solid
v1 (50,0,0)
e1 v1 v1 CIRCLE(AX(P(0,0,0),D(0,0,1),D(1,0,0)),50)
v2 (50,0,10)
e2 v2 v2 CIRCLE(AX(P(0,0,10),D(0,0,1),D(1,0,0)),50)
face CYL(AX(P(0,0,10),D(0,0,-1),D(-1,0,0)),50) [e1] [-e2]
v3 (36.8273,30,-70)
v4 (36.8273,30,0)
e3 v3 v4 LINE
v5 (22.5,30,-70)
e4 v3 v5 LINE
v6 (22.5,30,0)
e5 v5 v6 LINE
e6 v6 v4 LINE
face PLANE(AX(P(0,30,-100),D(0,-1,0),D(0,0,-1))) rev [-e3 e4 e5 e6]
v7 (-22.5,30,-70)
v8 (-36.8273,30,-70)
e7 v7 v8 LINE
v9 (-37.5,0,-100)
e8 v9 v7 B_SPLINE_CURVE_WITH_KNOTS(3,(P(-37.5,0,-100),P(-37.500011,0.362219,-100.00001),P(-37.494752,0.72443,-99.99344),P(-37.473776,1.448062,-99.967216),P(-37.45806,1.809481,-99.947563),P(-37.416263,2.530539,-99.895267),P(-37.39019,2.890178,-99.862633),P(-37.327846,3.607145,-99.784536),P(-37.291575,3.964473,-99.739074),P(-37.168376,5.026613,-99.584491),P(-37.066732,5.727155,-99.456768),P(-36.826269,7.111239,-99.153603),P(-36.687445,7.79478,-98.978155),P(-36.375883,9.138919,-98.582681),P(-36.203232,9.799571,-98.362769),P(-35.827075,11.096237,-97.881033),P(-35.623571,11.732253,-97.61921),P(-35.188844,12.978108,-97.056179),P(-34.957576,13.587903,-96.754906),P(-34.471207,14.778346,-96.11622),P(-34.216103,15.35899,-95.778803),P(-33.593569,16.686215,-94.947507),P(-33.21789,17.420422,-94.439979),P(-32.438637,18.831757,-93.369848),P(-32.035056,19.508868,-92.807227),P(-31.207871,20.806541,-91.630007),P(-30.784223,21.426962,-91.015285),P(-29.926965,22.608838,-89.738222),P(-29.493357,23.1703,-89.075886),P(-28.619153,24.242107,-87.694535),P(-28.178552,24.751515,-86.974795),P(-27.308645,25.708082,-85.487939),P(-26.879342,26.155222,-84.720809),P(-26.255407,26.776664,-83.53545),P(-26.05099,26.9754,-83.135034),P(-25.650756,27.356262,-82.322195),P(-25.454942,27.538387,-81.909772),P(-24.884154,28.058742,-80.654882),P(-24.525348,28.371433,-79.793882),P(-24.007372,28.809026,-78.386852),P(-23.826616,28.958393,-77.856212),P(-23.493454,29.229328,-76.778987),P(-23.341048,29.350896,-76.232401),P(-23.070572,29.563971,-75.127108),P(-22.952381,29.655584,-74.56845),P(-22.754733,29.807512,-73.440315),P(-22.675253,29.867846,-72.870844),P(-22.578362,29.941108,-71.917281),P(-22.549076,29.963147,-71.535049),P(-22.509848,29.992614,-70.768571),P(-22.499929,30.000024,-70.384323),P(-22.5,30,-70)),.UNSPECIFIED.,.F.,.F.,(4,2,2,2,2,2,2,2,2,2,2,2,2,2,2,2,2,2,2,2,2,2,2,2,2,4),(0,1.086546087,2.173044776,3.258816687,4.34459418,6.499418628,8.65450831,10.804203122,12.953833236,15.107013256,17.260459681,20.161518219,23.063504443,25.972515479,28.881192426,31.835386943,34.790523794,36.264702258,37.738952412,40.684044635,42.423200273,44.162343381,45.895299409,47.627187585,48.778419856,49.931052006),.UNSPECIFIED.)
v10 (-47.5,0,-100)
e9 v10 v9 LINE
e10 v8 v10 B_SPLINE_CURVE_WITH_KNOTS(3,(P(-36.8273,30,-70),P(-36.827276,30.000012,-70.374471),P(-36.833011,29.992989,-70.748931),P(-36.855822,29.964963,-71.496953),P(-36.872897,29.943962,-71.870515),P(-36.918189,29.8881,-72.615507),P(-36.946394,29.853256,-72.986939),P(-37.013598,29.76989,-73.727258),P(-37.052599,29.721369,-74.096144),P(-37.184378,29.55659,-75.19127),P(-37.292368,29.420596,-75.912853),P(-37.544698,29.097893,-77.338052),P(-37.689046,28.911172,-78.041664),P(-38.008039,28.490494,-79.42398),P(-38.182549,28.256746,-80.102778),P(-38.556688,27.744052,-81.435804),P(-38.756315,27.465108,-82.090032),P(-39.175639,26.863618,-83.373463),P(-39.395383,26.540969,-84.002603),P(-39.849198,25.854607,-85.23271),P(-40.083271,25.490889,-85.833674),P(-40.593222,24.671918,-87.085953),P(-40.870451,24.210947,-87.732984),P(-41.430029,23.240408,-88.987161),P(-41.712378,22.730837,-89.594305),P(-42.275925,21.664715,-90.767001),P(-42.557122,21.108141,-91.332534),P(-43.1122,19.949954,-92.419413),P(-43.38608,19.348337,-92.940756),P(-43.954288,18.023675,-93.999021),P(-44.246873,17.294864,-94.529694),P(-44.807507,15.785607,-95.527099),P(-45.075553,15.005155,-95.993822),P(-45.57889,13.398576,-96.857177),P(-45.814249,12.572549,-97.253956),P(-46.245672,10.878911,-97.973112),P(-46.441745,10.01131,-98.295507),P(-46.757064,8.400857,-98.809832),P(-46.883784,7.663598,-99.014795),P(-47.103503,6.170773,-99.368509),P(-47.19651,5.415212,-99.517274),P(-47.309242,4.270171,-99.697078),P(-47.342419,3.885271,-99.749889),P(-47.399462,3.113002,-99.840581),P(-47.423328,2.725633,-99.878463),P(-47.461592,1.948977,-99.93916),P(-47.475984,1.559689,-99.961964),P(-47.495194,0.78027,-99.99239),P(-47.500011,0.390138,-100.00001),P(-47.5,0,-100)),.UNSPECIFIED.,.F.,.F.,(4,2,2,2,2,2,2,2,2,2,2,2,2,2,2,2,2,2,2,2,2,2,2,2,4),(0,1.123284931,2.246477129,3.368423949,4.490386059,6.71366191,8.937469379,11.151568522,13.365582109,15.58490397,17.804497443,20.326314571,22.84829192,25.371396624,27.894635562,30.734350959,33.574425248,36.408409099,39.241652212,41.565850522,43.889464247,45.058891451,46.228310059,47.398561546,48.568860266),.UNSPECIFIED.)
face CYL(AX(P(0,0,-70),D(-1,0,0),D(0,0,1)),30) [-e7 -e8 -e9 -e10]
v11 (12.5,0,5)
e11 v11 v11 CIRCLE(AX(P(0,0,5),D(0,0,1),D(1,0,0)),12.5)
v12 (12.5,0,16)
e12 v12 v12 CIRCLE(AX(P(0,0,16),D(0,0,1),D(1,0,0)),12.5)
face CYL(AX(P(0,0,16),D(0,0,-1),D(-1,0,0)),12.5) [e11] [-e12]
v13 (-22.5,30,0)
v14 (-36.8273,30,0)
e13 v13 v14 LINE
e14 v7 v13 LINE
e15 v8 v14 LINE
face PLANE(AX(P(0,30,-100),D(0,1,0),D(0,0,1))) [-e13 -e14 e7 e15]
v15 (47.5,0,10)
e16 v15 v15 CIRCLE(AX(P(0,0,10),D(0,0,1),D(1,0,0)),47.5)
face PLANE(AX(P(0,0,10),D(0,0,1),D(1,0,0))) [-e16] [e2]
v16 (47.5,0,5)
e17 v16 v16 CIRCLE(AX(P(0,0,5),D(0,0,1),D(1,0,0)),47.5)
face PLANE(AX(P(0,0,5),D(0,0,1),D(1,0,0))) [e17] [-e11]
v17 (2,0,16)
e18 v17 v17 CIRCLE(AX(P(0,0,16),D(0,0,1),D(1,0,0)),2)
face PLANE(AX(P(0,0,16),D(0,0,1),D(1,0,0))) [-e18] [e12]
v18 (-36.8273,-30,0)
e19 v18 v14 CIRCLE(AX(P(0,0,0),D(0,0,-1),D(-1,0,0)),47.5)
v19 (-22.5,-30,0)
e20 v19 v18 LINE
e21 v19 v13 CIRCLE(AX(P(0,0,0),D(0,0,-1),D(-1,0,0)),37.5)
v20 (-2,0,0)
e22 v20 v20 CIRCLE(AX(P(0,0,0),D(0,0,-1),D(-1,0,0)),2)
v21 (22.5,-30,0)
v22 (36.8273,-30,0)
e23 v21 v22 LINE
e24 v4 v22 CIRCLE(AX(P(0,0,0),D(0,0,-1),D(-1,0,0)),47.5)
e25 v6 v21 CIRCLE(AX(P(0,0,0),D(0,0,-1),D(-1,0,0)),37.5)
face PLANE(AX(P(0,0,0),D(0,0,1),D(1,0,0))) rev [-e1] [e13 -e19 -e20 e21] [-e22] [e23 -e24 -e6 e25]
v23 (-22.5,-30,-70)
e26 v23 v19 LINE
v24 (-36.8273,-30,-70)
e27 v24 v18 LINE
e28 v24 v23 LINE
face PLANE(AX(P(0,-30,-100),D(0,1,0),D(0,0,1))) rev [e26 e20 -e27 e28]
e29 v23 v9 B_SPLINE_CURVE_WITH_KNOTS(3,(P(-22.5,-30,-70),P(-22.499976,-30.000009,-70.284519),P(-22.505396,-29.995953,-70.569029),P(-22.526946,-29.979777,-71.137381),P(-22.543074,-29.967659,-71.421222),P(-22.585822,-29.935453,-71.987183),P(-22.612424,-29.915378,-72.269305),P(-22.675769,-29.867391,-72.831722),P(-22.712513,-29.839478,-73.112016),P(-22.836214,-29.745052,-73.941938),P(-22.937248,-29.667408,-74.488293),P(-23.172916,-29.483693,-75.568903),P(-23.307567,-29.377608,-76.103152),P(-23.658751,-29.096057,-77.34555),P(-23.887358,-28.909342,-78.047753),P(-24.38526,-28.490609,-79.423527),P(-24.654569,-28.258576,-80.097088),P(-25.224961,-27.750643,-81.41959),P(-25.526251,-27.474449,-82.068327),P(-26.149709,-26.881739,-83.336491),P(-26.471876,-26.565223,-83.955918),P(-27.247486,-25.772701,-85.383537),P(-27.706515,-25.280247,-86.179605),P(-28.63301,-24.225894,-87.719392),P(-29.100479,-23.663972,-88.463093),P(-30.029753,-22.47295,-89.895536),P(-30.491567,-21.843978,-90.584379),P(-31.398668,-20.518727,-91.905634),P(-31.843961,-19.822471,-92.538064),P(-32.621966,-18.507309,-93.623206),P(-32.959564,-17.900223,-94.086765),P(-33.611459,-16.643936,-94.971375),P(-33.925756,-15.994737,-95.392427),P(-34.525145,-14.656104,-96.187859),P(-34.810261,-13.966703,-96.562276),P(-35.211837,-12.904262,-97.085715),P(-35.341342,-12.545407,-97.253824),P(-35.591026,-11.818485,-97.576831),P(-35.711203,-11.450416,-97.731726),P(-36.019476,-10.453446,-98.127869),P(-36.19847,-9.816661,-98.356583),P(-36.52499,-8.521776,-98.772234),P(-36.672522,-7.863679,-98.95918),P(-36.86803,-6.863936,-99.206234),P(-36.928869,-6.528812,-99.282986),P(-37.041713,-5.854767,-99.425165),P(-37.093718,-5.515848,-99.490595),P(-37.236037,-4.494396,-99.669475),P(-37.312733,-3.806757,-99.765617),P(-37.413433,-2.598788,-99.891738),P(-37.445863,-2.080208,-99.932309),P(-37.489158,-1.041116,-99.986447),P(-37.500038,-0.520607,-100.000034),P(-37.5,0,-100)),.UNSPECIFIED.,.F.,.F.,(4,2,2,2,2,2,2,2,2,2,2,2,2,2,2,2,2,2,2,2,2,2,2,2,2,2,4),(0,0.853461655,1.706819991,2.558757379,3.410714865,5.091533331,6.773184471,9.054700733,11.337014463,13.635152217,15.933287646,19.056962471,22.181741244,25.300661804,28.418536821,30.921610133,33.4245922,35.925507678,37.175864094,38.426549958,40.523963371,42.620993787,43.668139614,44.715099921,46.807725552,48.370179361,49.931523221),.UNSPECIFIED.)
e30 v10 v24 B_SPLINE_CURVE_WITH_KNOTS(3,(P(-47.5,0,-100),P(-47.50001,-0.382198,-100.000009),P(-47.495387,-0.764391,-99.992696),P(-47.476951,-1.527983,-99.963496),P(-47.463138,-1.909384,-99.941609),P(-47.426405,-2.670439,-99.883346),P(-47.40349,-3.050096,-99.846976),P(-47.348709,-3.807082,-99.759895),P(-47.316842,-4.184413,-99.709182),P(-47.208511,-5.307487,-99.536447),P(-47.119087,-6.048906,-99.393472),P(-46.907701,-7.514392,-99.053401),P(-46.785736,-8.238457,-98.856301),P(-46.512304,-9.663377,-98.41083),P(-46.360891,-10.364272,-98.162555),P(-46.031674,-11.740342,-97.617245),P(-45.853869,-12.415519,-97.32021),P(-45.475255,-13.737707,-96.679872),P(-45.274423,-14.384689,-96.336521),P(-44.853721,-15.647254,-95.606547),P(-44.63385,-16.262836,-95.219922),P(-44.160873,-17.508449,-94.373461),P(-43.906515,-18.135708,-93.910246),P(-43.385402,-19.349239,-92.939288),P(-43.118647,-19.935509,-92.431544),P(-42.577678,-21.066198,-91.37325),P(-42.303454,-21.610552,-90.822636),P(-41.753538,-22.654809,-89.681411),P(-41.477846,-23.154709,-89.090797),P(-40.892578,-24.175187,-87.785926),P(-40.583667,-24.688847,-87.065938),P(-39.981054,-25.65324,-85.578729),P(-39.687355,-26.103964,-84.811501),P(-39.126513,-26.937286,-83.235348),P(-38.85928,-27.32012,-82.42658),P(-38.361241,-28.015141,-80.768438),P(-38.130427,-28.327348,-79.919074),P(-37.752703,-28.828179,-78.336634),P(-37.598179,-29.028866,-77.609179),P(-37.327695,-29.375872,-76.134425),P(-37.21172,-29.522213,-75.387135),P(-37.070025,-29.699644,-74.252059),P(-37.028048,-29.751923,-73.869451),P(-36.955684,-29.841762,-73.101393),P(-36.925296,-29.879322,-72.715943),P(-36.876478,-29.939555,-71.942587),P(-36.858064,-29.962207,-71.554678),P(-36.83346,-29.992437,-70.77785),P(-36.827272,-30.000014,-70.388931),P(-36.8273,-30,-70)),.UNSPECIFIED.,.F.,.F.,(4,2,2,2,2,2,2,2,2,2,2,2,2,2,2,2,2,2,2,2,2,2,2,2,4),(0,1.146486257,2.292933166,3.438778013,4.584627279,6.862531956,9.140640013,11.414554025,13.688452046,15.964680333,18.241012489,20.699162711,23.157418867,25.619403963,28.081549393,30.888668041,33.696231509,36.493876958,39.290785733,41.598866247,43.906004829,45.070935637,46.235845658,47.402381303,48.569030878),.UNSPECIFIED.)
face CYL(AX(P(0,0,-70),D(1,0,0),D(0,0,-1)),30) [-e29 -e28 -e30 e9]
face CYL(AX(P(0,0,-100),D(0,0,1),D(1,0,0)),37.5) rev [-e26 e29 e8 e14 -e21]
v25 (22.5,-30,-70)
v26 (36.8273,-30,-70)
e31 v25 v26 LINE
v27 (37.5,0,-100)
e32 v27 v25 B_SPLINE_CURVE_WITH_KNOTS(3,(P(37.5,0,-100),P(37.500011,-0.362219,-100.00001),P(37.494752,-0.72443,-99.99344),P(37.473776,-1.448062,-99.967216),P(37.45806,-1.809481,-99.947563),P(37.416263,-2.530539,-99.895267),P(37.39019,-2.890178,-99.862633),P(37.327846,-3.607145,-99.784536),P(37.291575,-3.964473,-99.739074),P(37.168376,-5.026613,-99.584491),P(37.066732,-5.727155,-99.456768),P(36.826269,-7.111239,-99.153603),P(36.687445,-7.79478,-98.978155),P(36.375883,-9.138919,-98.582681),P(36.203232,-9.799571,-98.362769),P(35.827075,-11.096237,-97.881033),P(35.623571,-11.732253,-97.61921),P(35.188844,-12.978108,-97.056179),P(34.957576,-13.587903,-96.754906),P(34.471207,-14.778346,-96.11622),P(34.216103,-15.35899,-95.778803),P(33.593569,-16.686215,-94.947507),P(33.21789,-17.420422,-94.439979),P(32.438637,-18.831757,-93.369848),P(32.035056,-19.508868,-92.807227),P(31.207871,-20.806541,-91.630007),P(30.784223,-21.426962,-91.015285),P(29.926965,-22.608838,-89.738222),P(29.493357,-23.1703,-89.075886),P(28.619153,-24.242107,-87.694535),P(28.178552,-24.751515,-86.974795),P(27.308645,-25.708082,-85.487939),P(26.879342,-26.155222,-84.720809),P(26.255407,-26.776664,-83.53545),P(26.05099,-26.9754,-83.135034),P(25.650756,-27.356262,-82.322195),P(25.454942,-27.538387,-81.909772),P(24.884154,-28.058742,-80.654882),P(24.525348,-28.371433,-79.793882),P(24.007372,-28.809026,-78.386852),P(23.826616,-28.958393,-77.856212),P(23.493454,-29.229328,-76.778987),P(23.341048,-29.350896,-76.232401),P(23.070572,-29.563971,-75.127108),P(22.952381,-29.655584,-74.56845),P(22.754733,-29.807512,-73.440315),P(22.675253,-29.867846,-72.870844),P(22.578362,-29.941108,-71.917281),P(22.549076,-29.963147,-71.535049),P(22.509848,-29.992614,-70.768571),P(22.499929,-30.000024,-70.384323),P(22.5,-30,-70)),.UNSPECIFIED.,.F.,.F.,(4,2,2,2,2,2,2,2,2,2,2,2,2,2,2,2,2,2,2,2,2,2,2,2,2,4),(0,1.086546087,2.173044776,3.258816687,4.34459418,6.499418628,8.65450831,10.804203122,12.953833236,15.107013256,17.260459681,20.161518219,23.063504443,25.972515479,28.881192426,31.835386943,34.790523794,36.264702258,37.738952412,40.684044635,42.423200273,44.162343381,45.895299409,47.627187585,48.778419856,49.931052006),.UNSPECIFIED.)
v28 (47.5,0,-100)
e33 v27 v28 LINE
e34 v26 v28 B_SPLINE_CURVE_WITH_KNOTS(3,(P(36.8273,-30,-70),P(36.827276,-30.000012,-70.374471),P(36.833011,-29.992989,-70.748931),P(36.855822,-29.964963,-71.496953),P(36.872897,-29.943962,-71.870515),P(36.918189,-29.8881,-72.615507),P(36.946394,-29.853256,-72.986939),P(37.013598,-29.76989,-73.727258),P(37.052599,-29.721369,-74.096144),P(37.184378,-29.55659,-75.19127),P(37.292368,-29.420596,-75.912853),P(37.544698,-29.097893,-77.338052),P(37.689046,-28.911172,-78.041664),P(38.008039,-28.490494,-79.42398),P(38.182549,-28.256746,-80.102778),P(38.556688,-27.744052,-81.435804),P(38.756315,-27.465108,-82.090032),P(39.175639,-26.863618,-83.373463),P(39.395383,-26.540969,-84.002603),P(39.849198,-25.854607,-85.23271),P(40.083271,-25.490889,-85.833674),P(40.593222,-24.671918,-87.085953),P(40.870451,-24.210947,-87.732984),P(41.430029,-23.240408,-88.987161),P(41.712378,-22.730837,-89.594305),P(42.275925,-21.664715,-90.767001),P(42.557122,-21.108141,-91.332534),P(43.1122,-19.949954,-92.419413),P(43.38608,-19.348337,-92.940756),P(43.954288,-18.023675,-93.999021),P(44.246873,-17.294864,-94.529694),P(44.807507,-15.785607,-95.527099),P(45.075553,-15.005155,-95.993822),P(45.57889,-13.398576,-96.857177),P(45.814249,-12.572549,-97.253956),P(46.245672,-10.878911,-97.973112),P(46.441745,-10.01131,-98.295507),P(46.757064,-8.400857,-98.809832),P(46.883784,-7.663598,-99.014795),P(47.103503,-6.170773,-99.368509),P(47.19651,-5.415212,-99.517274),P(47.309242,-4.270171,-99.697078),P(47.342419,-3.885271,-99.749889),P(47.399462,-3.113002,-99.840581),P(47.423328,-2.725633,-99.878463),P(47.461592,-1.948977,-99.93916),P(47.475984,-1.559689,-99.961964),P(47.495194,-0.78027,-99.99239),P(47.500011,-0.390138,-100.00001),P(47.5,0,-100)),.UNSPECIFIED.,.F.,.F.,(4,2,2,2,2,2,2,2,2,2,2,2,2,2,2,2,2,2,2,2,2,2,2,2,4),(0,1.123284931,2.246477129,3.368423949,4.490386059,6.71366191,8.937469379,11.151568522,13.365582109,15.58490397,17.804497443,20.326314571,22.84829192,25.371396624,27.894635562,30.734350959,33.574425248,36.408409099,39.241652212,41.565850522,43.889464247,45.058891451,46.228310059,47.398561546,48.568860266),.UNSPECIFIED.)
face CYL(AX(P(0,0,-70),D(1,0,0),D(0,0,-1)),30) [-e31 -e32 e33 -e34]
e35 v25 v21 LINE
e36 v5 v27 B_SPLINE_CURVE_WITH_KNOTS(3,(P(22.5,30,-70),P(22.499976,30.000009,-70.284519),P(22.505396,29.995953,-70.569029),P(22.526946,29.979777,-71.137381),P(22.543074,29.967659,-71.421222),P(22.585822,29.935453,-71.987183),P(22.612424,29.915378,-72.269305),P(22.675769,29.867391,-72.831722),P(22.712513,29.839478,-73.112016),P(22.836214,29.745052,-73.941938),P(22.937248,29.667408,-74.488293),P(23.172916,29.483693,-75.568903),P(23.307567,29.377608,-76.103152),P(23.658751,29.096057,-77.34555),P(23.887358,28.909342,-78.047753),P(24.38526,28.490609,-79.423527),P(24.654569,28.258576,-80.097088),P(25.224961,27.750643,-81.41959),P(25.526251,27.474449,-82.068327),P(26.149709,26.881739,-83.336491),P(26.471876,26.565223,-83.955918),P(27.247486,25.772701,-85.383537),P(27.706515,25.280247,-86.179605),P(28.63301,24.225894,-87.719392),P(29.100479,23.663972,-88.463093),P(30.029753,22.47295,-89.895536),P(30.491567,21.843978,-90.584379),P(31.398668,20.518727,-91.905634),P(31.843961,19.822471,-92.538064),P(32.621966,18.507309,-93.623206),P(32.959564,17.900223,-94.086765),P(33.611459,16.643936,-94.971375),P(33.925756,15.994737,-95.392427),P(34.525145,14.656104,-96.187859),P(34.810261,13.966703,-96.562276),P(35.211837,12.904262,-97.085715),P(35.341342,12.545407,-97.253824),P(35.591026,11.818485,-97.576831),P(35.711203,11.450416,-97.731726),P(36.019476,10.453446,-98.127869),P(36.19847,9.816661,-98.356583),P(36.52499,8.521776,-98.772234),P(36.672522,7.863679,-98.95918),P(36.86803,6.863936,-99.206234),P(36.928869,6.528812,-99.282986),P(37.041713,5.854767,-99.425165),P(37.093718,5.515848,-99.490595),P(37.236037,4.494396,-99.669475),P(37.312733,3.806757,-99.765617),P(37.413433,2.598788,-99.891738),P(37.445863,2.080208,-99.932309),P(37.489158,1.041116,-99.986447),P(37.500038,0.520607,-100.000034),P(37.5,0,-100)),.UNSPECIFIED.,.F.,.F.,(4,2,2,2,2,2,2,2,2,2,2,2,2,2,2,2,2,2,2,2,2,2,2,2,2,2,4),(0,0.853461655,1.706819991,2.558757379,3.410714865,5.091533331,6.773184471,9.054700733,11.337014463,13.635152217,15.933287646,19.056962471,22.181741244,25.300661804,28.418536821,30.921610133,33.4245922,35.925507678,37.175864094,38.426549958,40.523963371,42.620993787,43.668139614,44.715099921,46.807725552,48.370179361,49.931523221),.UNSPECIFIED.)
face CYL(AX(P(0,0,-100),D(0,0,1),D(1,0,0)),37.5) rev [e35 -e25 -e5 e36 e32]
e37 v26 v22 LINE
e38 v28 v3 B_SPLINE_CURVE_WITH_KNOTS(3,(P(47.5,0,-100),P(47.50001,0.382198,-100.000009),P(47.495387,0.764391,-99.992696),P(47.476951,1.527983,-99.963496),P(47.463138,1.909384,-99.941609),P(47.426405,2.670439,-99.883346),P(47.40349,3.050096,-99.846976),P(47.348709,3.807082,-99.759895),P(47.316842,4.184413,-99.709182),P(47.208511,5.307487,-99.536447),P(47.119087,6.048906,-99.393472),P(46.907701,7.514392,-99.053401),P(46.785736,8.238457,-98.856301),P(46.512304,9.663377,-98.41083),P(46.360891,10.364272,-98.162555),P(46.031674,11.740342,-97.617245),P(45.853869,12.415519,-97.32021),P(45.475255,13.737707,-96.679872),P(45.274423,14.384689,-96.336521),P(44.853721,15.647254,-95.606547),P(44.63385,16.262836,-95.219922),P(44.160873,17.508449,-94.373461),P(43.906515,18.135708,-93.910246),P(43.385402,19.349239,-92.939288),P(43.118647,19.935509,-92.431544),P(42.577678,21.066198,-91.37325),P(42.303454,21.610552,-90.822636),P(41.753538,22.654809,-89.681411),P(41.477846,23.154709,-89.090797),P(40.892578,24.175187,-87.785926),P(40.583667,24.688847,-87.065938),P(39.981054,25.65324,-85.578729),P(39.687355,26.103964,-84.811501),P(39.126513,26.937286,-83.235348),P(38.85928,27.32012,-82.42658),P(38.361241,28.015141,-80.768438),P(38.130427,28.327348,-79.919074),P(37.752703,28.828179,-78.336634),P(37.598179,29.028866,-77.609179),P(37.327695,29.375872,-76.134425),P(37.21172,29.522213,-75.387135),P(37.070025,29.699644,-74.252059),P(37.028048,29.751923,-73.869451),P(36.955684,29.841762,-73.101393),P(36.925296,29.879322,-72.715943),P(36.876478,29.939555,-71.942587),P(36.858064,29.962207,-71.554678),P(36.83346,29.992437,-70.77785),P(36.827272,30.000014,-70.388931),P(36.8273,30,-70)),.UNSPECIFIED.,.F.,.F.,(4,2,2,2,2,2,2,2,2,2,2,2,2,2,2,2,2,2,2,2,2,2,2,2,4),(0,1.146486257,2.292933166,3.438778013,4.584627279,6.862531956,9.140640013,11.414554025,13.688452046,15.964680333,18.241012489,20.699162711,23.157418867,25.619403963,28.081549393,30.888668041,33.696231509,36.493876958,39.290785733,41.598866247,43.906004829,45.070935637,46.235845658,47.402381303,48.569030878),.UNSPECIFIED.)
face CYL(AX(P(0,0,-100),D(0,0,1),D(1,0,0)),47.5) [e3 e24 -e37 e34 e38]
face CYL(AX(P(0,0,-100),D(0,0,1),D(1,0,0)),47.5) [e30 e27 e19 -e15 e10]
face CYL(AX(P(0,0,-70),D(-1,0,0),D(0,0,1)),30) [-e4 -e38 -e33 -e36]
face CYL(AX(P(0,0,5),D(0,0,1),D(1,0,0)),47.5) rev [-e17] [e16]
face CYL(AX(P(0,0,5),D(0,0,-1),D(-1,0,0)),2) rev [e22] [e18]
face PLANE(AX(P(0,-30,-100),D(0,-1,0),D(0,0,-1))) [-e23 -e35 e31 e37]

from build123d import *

# Parameters (mm, degrees)
ESQUISSE1_R             = 50
BOSS_EXTRU_1_DEPTH      = 10
ESQUISSE2_R             = 47.5
ENL_V_MAT_EXTRU_1_DEPTH = 5
ESQUISSE3_R             = 2
ENL_V_MAT_EXTRU_2_DEPTH = 5
BOSS_EXTRU_2_DEPTH      = 100
CONG_1_R                = 30
ESQUISSE5_R             = 12.5
BOSS_EXTRU_3_DEPTH      = 11
ENL_V_START             = -11
ESQUISSE6_R             = 2
ENL_V_MAT_EXTRU_3_DEPTH = 11


with BuildPart() as part:
    # Esquisse1 → Boss.-Extru.1 (new body)
    with BuildSketch(Plane.XY):
        Circle(ESQUISSE1_R)
    extrude(amount=BOSS_EXTRU_1_DEPTH)

    # Esquisse2 → Enlèv. mat.-Extru.1 (cut)
    with BuildSketch(Plane.XY.offset(10)):
        Circle(ESQUISSE2_R)
    extrude(amount=-ENL_V_MAT_EXTRU_1_DEPTH, mode=Mode.SUBTRACT)

    # Esquisse3 → Enlèv. mat.-Extru.2 (cut)
    with BuildSketch(Plane(origin=(0, 0, 0), x_dir=(-1, 0, 0), z_dir=(0, 0, -1))):
        Circle(ESQUISSE3_R)
    extrude(amount=-ENL_V_MAT_EXTRU_2_DEPTH, mode=Mode.SUBTRACT)

    # Esquisse4 → Boss.-Extru.2 (add)
    with BuildSketch(Plane(origin=(0, 0, 0), x_dir=(-1, 0, 0), z_dir=(0, 0, -1))):
        with BuildLine():
            ThreePointArc((-22.5, -30), (-37.5, 0), (-22.5, 30))
            Line((-22.5, 30), (-36.827299657, 30))
            ThreePointArc((-36.827299657, 30), (-47.5, 0), (-36.827299657, -30))
            Line((-36.827299657, -30), (-22.5, -30))
        make_face()
        with BuildLine():
            Line((36.827299657, 30), (22.5, 30))
            ThreePointArc((22.5, 30), (33.541019662, 16.770509831), (37.5, 0))
            ThreePointArc((37.5, 0), (33.541019662, -16.770509831), (22.5, -30))
            Line((22.5, -30), (36.827299657, -30))
            ThreePointArc((36.827299657, -30), (44.752355992, -15.920949505), (47.5, 0))
            ThreePointArc((47.5, 0), (44.752355992, 15.920949505), (36.827299657, 30))
        make_face()
    extrude(amount=BOSS_EXTRU_2_DEPTH)

    # Congé1
    # the kernel refuses this fillet: 30 mm, written as the material it takes off along each edge
    with BuildSketch(Plane(origin=(111.827299657, -30, -100), x_dir=(0, 0, 1), z_dir=(-1, 0, 0)), Plane(origin=(-52.5, 30, -100), x_dir=(0, 0, 1), z_dir=(1, 0, 0)), Plane(origin=(52.5, -30, -100), x_dir=(0, 0, 1), z_dir=(-1, 0, 0)), Plane(origin=(-111.827299657, 30, -100), x_dir=(0, 0, 1), z_dir=(1, 0, 0))) as cong_1_piece_1:
        with BuildLine():
            CenterArc((CONG_1_R, CONG_1_R), CONG_1_R, 180, 90)
            Line((0, CONG_1_R), (0, 0))
            Line((0, 0), (CONG_1_R, 0))
        make_face()
    extrude(amount=164.327299657, mode=Mode.SUBTRACT)

    # Esquisse5 → Boss.-Extru.3 (add)
    with BuildSketch(Plane.XY.offset(5)):
        Circle(ESQUISSE5_R)
    extrude(amount=BOSS_EXTRU_3_DEPTH)

    # Esquisse6 → Enlèv. mat.-Extru.3 (cut)
    with BuildSketch(Plane.XY.offset(16).offset(ENL_V_START)):
        with Locations(Location((0, 0, 0), (0, 0, 180))):
            Circle(ESQUISSE6_R)
    extrude(amount=ENL_V_MAT_EXTRU_3_DEPTH, mode=Mode.SUBTRACT)


solid = part.part
